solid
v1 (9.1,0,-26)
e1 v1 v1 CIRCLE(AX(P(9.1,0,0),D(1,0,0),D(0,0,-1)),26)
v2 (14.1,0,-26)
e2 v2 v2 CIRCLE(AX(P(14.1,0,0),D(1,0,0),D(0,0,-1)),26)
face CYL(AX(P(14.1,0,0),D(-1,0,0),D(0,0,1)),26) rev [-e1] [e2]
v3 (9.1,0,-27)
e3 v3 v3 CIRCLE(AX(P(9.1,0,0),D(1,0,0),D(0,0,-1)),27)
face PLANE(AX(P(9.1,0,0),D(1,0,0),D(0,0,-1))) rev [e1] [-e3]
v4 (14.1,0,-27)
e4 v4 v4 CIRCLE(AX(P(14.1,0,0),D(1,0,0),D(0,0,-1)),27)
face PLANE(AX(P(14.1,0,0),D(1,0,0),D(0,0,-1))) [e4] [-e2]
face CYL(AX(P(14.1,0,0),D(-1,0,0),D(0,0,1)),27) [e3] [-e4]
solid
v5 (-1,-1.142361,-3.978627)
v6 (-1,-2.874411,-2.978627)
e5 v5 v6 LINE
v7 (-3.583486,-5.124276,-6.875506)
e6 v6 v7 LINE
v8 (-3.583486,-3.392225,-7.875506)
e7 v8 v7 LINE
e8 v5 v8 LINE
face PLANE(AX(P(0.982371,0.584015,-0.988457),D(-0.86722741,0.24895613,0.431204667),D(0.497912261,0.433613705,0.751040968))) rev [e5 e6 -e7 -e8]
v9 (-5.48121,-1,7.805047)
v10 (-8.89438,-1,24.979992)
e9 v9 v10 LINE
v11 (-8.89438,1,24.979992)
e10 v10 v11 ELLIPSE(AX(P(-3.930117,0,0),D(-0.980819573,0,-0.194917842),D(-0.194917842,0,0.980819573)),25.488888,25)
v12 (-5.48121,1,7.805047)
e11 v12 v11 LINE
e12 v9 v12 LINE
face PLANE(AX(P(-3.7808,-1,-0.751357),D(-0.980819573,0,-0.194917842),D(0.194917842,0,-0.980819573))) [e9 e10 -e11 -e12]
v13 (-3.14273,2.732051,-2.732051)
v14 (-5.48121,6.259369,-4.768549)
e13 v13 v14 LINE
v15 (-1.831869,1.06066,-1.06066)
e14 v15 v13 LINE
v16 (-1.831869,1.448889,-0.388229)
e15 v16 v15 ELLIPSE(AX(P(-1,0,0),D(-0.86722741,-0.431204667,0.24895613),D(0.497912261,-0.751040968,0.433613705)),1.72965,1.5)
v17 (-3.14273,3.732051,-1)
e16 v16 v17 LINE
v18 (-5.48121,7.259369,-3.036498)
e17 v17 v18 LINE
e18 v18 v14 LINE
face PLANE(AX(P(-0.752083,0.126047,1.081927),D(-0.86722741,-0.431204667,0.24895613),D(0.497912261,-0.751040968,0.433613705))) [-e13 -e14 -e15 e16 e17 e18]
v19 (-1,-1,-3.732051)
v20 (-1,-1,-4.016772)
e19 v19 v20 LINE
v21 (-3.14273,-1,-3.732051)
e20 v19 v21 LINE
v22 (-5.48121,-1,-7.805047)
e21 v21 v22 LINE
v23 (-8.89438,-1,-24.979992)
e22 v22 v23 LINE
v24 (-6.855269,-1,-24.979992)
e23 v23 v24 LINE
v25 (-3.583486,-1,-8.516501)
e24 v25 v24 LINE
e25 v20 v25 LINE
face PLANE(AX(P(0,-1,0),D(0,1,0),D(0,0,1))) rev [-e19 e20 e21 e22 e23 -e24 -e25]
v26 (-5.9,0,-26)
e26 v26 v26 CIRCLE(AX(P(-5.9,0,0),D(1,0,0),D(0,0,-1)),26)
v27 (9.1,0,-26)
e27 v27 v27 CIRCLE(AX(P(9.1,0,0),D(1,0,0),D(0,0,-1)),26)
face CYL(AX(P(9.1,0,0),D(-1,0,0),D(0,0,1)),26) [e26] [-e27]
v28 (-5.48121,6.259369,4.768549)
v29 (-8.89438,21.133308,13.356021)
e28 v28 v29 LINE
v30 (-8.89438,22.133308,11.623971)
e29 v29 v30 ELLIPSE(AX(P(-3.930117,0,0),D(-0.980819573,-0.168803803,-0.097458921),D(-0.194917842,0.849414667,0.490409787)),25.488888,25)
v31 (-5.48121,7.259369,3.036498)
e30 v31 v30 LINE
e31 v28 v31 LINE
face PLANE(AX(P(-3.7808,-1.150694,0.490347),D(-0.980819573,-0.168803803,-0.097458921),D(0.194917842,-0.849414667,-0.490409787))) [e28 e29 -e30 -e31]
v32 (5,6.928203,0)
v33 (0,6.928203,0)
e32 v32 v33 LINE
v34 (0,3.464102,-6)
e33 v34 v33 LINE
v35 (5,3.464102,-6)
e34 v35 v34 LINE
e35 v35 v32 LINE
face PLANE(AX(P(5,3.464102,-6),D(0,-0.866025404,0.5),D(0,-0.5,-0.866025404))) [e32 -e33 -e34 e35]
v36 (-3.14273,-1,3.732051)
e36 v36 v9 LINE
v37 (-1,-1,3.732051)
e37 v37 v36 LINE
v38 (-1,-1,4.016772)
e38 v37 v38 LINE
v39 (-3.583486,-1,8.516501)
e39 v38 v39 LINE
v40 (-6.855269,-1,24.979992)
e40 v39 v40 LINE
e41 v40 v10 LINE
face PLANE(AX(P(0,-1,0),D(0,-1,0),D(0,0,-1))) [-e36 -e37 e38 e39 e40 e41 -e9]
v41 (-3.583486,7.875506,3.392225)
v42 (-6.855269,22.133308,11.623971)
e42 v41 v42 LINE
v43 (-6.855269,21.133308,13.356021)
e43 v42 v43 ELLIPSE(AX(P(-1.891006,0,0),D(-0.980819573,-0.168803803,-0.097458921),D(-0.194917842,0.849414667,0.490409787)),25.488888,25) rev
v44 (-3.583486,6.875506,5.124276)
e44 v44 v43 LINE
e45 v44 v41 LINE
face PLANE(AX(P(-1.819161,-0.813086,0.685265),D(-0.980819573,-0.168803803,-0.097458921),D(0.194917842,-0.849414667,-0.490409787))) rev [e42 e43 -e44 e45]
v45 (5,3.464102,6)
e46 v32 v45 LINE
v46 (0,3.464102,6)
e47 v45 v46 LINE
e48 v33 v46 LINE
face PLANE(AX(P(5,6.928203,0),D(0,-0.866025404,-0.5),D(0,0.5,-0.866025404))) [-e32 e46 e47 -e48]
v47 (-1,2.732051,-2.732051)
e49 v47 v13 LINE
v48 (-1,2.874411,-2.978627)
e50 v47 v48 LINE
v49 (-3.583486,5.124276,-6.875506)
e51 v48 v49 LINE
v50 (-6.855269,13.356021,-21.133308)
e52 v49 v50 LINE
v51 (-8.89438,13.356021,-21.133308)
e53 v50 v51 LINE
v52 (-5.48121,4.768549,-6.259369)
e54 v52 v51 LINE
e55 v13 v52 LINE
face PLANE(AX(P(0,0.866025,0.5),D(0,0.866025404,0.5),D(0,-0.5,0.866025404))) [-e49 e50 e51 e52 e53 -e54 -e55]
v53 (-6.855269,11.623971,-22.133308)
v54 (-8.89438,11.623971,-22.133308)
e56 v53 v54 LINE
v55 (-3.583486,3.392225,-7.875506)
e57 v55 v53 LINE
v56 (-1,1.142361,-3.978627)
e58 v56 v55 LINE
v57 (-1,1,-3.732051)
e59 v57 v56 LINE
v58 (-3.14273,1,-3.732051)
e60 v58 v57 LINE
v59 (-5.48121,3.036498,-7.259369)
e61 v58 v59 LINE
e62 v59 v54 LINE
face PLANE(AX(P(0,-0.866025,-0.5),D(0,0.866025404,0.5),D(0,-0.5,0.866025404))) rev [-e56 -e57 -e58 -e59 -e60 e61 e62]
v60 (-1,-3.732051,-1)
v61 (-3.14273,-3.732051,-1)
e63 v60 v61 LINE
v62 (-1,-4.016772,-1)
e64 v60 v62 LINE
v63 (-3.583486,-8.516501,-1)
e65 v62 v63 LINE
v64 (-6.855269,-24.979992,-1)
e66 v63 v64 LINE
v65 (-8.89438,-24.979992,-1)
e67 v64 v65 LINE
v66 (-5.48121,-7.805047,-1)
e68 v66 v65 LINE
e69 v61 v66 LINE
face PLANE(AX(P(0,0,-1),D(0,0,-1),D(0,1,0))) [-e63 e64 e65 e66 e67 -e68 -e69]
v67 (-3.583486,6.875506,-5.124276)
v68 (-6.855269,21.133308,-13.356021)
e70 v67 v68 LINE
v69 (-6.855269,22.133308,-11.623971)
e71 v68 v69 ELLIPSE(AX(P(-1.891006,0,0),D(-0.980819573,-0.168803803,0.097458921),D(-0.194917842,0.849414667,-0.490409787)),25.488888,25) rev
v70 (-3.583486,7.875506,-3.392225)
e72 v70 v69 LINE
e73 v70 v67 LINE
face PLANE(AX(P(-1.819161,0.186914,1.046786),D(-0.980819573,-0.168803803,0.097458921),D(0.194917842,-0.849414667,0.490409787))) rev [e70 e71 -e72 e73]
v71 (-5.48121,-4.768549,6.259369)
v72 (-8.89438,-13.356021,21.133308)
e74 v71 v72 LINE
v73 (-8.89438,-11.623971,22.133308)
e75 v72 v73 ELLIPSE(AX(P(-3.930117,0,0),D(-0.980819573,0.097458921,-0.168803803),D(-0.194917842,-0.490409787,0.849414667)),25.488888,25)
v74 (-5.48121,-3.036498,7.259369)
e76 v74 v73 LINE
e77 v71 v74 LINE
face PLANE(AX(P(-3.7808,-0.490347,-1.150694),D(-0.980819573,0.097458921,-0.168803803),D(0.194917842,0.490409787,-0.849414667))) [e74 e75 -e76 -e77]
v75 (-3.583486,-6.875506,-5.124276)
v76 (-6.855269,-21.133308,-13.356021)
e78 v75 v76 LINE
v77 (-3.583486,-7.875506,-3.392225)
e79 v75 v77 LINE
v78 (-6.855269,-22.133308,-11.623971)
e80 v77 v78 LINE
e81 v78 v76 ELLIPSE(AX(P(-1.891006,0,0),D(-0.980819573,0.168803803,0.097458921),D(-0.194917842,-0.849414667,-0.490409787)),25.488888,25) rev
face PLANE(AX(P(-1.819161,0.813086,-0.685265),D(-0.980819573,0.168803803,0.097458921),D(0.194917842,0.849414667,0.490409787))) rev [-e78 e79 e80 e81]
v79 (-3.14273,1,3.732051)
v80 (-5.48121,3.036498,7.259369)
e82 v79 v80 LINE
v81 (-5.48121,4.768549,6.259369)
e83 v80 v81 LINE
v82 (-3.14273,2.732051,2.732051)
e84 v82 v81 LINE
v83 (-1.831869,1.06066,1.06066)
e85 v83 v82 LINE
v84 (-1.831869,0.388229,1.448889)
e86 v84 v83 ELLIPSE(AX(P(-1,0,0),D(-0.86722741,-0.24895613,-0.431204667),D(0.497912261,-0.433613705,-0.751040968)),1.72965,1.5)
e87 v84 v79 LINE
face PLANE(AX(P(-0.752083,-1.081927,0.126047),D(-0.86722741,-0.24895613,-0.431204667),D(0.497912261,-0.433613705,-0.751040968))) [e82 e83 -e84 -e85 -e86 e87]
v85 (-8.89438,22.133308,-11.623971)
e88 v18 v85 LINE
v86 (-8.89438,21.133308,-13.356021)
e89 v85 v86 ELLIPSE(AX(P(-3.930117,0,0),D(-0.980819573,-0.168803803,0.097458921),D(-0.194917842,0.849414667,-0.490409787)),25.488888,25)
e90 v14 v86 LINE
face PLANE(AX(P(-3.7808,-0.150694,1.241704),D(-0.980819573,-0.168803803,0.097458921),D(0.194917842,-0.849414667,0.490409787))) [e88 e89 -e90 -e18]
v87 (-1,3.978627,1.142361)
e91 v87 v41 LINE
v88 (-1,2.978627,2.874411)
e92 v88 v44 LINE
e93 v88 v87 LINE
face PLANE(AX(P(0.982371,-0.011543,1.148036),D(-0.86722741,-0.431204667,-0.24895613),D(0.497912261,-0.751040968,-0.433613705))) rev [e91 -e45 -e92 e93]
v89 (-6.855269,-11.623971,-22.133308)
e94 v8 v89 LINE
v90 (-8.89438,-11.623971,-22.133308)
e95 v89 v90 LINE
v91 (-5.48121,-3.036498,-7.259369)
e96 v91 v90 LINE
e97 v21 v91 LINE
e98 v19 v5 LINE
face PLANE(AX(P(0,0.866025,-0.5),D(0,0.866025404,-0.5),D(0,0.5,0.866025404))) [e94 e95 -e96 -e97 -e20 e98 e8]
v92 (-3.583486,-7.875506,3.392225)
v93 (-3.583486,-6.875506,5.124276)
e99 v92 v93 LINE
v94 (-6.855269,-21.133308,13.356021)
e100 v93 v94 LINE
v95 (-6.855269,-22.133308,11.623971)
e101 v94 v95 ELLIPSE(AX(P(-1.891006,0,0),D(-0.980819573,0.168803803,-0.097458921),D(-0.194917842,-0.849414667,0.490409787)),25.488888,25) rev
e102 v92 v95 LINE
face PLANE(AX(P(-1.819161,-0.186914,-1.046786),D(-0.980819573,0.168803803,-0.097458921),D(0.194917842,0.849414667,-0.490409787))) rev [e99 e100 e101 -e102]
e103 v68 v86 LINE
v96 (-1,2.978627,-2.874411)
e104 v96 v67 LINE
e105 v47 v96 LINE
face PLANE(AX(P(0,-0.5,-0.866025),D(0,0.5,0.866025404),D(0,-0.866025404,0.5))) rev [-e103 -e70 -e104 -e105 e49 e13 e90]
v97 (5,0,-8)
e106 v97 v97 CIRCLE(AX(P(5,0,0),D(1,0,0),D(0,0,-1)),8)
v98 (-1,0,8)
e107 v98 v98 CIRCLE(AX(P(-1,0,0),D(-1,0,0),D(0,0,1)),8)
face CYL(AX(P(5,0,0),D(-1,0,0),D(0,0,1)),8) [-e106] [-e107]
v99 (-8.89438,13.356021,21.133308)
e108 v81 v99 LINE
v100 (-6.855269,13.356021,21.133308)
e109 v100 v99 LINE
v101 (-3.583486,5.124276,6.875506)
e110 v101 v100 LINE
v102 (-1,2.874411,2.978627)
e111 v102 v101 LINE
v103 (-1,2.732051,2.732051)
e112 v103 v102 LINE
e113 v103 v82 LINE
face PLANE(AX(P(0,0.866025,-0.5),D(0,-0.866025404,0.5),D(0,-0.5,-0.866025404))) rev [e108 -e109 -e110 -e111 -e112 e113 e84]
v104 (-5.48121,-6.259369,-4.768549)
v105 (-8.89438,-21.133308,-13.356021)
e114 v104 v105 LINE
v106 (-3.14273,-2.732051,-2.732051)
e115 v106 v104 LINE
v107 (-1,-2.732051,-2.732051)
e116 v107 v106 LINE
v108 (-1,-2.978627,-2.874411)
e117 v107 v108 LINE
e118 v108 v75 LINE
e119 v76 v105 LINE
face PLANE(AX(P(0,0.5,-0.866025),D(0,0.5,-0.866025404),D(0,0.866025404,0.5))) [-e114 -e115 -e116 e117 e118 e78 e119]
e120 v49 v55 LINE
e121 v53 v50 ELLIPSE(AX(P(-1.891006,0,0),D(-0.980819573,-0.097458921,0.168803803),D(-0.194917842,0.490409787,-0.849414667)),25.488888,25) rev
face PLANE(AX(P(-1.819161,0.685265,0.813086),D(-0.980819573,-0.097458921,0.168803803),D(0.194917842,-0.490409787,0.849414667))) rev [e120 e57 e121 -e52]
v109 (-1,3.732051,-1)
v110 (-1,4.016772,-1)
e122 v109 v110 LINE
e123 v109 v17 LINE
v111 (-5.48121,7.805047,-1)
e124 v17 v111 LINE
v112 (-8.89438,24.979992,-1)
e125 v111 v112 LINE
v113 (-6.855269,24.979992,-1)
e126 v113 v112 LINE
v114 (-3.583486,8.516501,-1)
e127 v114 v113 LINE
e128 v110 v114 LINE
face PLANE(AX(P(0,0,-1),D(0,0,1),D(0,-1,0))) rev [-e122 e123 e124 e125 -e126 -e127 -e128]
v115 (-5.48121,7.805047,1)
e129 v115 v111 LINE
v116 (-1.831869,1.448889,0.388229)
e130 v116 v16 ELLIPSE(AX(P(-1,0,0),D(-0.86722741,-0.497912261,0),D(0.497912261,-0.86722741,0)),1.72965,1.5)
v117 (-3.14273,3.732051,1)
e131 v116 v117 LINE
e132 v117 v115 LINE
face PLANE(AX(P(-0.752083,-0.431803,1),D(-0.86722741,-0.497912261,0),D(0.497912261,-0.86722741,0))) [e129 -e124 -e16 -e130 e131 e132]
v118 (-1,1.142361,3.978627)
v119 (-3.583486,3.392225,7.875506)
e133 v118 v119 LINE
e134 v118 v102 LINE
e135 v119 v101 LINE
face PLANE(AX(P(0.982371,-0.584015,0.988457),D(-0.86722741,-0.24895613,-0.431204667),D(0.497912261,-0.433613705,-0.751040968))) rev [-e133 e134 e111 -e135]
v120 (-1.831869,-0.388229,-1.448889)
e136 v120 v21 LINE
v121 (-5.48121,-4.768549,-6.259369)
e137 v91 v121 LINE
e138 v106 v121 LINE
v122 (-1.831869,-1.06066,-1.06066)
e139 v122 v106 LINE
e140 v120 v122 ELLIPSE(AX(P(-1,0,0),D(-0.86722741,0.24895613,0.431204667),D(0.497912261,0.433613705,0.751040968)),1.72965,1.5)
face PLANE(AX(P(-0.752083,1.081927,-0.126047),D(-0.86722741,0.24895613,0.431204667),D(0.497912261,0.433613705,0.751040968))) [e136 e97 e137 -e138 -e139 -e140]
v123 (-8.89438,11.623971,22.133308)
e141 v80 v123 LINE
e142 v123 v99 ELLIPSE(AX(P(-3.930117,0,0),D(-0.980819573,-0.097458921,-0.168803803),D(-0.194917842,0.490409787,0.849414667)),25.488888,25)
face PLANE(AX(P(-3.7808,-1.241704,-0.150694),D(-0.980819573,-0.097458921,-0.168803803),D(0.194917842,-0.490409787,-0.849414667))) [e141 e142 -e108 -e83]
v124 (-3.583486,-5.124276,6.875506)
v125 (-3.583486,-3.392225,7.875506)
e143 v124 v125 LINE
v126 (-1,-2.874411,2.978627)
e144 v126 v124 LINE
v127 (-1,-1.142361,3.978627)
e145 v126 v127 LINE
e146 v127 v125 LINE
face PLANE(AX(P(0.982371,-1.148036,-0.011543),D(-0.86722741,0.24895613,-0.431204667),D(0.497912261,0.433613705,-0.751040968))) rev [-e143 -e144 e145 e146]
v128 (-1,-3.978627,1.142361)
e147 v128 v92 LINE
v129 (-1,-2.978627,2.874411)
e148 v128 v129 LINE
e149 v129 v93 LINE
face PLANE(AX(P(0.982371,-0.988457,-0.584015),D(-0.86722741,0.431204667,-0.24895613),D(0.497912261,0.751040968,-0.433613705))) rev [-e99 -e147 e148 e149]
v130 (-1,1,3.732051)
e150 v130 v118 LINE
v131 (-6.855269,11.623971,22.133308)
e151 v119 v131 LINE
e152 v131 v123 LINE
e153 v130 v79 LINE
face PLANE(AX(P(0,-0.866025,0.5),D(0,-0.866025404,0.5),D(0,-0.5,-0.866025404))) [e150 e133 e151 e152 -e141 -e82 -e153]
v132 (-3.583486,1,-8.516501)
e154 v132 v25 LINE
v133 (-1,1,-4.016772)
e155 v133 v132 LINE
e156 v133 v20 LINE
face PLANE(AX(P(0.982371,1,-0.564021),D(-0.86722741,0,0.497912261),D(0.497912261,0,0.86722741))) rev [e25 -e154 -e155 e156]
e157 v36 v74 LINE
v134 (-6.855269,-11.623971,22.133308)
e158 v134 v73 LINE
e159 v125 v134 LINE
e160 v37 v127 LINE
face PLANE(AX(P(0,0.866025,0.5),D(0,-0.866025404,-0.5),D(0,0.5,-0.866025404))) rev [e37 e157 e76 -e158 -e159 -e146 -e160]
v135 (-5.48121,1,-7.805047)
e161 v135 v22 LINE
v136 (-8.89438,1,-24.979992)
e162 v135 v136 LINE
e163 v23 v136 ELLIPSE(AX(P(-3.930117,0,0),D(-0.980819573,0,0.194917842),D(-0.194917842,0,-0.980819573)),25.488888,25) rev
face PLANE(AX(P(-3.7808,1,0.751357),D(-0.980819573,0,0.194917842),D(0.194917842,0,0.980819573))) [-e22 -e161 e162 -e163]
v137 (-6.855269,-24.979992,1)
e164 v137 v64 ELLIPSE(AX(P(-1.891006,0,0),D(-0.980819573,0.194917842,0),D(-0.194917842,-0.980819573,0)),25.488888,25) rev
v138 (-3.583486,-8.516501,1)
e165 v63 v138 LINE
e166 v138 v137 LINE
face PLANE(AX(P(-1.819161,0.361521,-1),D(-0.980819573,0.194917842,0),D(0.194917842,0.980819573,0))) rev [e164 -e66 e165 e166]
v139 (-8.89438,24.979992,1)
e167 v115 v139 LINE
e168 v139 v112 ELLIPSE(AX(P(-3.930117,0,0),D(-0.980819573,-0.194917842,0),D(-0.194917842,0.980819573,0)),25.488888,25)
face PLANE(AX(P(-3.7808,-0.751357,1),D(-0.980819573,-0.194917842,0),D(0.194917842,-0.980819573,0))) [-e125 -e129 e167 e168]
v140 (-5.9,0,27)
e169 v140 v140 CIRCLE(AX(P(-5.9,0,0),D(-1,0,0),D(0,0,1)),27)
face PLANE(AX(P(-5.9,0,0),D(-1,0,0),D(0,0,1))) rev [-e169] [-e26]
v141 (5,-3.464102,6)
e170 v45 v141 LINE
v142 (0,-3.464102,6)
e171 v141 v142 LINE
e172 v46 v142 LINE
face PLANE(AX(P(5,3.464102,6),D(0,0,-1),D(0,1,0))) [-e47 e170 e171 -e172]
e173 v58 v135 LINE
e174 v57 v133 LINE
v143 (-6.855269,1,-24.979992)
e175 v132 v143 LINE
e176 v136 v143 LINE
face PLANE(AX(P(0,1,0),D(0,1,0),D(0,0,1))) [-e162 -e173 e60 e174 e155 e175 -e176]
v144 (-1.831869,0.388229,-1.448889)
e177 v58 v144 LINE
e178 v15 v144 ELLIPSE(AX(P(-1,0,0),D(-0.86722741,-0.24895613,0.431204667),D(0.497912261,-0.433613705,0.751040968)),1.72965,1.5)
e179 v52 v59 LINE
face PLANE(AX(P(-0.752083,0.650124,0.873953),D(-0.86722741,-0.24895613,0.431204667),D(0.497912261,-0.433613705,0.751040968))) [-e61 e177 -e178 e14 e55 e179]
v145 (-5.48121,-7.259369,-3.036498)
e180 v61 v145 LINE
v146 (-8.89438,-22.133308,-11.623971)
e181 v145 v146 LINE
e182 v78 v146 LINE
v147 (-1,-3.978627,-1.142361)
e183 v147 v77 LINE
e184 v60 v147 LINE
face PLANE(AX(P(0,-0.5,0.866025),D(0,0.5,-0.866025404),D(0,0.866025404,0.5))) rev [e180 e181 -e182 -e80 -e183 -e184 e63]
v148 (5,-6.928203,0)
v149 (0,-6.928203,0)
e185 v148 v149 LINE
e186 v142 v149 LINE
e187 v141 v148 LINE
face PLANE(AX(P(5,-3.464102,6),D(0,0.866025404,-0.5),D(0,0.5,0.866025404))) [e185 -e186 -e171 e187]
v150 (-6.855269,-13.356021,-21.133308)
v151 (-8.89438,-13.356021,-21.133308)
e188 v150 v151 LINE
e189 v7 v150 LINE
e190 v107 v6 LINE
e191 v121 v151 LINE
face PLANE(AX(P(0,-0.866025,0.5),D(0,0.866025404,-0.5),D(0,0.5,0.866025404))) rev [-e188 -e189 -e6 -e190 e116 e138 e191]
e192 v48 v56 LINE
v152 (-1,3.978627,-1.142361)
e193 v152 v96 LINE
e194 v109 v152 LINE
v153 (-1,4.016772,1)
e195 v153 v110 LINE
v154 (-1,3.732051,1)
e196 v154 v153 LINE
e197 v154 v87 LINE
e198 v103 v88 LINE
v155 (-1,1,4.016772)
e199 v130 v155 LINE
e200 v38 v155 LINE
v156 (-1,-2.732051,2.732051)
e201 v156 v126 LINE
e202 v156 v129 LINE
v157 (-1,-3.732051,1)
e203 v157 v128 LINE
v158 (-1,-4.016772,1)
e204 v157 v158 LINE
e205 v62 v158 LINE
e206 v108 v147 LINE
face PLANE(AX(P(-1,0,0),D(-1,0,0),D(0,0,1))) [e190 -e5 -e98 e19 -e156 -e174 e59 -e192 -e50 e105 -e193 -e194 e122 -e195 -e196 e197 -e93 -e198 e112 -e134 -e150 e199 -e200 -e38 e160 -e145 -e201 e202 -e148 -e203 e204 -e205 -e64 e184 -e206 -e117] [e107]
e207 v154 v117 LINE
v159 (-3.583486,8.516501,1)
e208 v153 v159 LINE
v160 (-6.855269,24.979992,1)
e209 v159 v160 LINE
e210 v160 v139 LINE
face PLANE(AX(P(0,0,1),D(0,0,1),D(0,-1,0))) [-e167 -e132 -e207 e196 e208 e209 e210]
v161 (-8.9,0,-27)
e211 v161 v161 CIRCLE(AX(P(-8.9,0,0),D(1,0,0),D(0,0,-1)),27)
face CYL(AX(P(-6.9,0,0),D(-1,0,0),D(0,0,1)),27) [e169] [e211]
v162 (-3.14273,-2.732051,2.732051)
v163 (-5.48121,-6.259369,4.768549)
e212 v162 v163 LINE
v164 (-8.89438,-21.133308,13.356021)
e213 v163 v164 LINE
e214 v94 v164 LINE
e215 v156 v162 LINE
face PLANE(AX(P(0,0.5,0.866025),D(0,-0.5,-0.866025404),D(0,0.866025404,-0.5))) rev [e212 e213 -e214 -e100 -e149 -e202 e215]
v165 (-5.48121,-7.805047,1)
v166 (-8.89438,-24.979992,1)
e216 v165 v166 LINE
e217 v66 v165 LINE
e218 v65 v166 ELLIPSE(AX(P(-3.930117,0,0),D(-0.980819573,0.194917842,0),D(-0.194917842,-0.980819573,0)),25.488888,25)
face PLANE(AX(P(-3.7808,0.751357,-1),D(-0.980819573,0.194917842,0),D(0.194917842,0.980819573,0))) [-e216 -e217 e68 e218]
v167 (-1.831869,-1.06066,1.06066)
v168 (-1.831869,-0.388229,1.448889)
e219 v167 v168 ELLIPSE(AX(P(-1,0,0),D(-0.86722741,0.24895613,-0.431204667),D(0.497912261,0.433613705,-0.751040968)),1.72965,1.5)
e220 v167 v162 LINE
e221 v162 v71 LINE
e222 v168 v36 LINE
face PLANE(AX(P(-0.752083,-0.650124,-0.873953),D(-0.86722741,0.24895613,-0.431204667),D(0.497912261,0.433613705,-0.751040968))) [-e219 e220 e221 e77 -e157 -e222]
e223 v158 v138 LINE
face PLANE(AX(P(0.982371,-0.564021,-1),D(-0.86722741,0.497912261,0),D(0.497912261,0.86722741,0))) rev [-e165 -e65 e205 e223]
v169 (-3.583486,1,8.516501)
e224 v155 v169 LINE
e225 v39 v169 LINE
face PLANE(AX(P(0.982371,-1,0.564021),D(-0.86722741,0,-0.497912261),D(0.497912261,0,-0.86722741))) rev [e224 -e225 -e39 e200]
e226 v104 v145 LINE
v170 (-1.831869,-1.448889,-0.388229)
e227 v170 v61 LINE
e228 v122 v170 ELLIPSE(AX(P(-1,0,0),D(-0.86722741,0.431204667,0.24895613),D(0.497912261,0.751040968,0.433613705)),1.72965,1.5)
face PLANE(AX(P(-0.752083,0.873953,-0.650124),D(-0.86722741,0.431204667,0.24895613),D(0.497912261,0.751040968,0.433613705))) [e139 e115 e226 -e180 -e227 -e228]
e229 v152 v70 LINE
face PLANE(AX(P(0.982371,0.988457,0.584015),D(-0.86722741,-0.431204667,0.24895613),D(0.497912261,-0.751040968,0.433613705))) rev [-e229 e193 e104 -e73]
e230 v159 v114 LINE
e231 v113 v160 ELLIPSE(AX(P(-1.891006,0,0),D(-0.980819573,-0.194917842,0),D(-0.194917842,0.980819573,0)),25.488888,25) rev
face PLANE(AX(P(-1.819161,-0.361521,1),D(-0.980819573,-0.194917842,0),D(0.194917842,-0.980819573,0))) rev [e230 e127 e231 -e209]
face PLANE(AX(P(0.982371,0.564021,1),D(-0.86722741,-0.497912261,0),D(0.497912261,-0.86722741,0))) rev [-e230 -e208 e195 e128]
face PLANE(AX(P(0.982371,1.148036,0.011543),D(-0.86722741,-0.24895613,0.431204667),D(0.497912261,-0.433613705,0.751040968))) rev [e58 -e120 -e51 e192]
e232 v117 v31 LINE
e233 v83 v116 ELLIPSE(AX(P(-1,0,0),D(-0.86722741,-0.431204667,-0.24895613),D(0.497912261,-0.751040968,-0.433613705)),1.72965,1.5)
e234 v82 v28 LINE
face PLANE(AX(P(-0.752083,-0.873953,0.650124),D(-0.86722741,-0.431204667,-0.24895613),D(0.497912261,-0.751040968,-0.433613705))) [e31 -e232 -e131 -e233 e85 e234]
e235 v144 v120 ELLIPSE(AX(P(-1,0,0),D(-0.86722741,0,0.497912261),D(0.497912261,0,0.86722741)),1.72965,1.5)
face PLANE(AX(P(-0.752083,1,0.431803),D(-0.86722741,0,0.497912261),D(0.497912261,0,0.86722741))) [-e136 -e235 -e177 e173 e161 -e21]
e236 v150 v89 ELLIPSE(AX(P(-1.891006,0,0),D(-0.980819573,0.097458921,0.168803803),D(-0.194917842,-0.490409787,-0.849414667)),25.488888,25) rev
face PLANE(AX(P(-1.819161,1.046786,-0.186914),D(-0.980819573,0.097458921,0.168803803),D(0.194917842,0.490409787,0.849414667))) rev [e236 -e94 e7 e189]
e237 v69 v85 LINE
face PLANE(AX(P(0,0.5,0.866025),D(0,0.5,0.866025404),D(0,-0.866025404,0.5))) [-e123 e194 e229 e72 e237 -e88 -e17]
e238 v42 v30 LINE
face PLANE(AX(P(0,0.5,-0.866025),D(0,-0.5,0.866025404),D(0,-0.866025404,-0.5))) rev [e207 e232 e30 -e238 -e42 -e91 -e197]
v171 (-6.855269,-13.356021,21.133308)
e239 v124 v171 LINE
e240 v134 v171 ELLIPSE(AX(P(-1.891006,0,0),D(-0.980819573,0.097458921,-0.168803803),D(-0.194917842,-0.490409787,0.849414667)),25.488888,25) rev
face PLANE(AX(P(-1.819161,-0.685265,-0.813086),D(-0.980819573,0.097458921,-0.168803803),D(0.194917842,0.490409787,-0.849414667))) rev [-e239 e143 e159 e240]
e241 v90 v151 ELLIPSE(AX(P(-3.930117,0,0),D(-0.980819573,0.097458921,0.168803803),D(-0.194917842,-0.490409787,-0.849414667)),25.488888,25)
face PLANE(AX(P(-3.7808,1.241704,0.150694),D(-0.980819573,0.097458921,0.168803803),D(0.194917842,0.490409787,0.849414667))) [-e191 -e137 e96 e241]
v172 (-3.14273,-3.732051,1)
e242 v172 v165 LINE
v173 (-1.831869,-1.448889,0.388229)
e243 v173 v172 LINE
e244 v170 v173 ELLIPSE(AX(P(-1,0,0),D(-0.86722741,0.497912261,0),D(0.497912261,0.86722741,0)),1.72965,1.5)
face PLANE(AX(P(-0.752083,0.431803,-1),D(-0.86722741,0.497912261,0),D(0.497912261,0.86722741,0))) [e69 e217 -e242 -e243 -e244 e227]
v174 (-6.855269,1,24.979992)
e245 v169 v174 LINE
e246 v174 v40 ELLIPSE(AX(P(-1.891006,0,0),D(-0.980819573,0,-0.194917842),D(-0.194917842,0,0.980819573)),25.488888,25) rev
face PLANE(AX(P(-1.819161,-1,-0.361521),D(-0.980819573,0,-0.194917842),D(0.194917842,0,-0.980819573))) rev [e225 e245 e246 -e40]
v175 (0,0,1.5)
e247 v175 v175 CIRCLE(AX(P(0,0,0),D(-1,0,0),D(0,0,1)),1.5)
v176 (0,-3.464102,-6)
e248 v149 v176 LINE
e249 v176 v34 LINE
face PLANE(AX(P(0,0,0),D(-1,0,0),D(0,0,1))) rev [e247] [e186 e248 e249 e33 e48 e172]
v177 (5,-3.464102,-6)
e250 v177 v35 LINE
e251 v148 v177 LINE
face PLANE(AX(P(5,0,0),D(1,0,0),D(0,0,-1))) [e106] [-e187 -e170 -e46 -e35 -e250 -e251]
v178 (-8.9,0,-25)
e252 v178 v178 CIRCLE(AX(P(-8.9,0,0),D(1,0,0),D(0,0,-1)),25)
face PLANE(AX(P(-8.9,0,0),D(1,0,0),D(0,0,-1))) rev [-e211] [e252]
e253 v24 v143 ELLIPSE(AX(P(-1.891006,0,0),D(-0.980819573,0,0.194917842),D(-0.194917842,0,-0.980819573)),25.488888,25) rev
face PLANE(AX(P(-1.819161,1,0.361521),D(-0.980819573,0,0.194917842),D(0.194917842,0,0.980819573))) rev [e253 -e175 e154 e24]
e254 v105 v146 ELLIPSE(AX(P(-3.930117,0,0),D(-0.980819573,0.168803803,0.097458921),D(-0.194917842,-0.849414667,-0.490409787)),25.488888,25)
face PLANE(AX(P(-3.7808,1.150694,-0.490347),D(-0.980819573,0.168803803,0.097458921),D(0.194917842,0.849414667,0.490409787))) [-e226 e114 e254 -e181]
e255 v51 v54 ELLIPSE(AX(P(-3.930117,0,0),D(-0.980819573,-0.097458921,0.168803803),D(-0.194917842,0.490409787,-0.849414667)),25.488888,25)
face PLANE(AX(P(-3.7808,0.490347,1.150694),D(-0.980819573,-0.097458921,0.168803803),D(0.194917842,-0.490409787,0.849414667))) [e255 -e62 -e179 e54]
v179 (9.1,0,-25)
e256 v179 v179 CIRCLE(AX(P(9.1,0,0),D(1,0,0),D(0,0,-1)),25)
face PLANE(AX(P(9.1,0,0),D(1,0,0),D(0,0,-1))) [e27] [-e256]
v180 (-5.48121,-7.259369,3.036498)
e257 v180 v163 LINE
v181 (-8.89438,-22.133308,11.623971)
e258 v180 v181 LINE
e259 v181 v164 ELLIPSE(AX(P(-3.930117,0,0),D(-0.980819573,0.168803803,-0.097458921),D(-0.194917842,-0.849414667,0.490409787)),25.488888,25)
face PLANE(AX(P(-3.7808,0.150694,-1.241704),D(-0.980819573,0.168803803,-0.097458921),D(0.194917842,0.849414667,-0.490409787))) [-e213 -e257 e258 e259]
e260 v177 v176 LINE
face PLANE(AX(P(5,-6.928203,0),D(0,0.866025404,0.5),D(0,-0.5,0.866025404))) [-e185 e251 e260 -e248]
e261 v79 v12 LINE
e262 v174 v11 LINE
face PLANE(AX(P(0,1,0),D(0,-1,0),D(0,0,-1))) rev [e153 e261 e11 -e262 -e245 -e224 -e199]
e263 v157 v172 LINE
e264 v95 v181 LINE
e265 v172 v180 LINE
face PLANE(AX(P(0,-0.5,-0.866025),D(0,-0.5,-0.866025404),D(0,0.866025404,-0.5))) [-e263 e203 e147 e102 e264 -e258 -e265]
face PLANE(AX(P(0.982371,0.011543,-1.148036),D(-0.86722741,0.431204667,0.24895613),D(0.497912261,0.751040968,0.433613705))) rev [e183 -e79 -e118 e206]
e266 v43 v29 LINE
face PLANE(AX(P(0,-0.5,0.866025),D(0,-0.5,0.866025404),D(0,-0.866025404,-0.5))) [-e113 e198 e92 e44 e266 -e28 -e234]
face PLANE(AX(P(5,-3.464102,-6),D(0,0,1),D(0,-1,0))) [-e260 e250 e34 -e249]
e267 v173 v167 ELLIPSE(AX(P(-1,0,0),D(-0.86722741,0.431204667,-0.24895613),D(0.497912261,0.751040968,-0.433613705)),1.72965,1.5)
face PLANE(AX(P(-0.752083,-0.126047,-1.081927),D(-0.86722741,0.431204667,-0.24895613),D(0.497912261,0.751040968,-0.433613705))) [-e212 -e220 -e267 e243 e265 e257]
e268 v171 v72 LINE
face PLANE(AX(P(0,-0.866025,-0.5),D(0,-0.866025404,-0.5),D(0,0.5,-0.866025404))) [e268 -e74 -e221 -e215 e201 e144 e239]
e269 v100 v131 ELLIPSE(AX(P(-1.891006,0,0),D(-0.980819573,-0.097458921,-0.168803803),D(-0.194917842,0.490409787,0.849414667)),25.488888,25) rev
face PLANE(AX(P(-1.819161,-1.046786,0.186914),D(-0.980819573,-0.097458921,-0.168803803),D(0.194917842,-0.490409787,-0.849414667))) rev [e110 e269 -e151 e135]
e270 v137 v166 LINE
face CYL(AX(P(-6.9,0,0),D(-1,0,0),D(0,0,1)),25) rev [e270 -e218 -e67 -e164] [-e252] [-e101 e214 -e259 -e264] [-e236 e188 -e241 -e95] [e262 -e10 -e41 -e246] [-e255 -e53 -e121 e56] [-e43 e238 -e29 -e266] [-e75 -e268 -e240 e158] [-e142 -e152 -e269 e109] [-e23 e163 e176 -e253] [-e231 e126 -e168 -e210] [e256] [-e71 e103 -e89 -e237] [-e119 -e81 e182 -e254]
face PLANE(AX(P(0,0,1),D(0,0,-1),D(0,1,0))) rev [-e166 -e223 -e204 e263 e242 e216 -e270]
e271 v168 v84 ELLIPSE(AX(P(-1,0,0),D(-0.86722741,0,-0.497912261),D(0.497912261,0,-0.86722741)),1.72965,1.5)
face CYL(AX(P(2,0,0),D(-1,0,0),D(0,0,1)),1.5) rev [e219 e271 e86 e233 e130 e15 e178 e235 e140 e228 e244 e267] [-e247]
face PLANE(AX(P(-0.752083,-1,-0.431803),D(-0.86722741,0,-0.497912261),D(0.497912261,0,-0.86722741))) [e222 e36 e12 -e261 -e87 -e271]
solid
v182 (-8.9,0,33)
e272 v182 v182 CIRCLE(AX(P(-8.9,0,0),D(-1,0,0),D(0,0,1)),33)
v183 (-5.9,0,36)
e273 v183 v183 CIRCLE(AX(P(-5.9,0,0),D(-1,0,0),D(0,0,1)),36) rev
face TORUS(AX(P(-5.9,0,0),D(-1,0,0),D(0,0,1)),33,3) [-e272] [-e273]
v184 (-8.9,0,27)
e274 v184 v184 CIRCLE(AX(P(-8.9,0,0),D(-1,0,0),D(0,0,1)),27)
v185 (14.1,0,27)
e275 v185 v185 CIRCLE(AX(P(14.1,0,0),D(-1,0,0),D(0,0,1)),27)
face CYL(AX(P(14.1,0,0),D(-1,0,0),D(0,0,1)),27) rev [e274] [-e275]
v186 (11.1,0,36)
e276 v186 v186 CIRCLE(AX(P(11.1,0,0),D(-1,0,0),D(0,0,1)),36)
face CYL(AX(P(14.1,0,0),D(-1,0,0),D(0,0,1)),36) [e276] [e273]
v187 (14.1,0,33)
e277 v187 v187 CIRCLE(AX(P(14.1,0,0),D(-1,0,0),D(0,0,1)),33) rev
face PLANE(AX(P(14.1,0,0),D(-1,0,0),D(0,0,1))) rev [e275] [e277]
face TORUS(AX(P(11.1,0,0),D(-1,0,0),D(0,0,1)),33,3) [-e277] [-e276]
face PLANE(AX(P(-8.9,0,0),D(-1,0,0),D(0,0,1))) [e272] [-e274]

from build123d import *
from build123d.topology import SkipClean

# Parameters (mm, degrees)
SKETCH1_R            = 8
BOSS_EXTRUDE1_DEPTH  = 5
SKETCH2_R            = 8
BOSS_EXTRUDE2_DEPTH  = 1
SKETCH3_R            = 1.5
CUT_EXTRUDE1_DEPTH   = 3
BOSS_EXTRUDE3_DEPTH  = 1
SKETCH5_R            = 1.5
CUT_EXTRUDE2_DEPTH   = 50
CIRPATTERN3_COUNT    = 12
SKETCH12_R           = 27
SKETCH12_R_2         = 25
BOSS_EXTRUDE5_DEPTH  = 2
SKETCH14_R           = 27
SKETCH14_R_2         = 25
BOSS_EXTRUDE7_DEPTH  = 3
SKETCH15_R           = 26
SKETCH15_R_2         = 25
BOSS_EXTRUDE8_DEPTH  = 15
SKETCH16_R           = 27
SKETCH16_R_2         = 26
BOSS_EXTRUDE9_DEPTH  = 5
SKETCH17_R           = 36
SKETCH17_R_2         = 27
BOSS_EXTRUDE10_DEPTH = 23
FILLET3_R            = 3


with BuildPart() as part:
    # Sketch1 → Boss-Extrude1 (new body)
    with BuildSketch(Plane(origin=(0, 0, 0), x_dir=(0, 0, -1), z_dir=(1, 0, 0))):
        Circle(SKETCH1_R)
        Polygon((0, 6.92820323), (-6, 3.464101615), (-6, -3.464101615), (0, -6.92820323), (6, -3.464101615), (6, 3.464101615), align=None, mode=Mode.SUBTRACT)
    extrude(amount=BOSS_EXTRUDE1_DEPTH)



with BuildPart() as body_2:
    # Sketch2 → Boss-Extrude2 (new body)
    with BuildSketch(Plane.ZY):
        Circle(SKETCH2_R)
    extrude(amount=BOSS_EXTRUDE2_DEPTH)

    # Sketch3 → Cut-Extrude1 (cut)
    with BuildSketch(Plane.ZY.offset(1)):
        Circle(SKETCH3_R)
    extrude(amount=-CUT_EXTRUDE1_DEPTH, mode=Mode.SUBTRACT)


with BuildPart() as body_3:
    # Sketch4 → Boss-Extrude3 (new, symmetric)
    with BuildSketch(Plane(origin=(0, 0, 0), x_dir=(1, 0, 0), z_dir=(0, 1, 0))):
        Polygon((-5.481210349, 7.805046689), (-1, 0), (-1, 4.016771943), (-3.583486264, 8.516500664), (-6.859244832, 25), (-8.898355852, 25), align=None)
    extrude(amount=BOSS_EXTRUDE3_DEPTH, both=True)

    # Sketch5 → Cut-Extrude2 (cut)
    with BuildSketch(Plane(origin=(0, 0, 0), x_dir=(0, 0, -1), z_dir=(1, 0, 0))):
        Circle(SKETCH5_R)
    extrude(amount=-CUT_EXTRUDE2_DEPTH, mode=Mode.SUBTRACT)


with BuildPart() as cirpattern3_1:
    # CirPattern3: pattern copy
    add(body_3.part.rotate(Axis((-1, 0, 0), (-1, 0, 0)), 1 * 360 / CIRPATTERN3_COUNT))


with BuildPart() as cirpattern3_2:
    # CirPattern3: pattern copy
    add(body_3.part.rotate(Axis((-1, 0, 0), (-1, 0, 0)), 2 * 360 / CIRPATTERN3_COUNT))


with BuildPart() as cirpattern3_3:
    # CirPattern3: pattern copy
    add(body_3.part.rotate(Axis((-1, 0, 0), (-1, 0, 0)), 3 * 360 / CIRPATTERN3_COUNT))


with BuildPart() as cirpattern3_4:
    # CirPattern3: pattern copy
    add(body_3.part.rotate(Axis((-1, 0, 0), (-1, 0, 0)), 4 * 360 / CIRPATTERN3_COUNT))


with BuildPart() as cirpattern3_5:
    # CirPattern3: pattern copy
    add(body_3.part.rotate(Axis((-1, 0, 0), (-1, 0, 0)), 5 * 360 / CIRPATTERN3_COUNT))


with BuildPart() as cirpattern3_6:
    # CirPattern3: pattern copy
    add(body_3.part.rotate(Axis((-1, 0, 0), (-1, 0, 0)), 6 * 360 / CIRPATTERN3_COUNT))


with BuildPart() as cirpattern3_7:
    # CirPattern3: pattern copy
    add(body_3.part.rotate(Axis((-1, 0, 0), (-1, 0, 0)), 7 * 360 / CIRPATTERN3_COUNT))


with BuildPart() as cirpattern3_8:
    # CirPattern3: pattern copy
    add(body_3.part.rotate(Axis((-1, 0, 0), (-1, 0, 0)), 8 * 360 / CIRPATTERN3_COUNT))


with BuildPart() as cirpattern3_9:
    # CirPattern3: pattern copy
    add(body_3.part.rotate(Axis((-1, 0, 0), (-1, 0, 0)), 9 * 360 / CIRPATTERN3_COUNT))


with BuildPart() as cirpattern3_10:
    # CirPattern3: pattern copy
    add(body_3.part.rotate(Axis((-1, 0, 0), (-1, 0, 0)), 10 * 360 / CIRPATTERN3_COUNT))


with BuildPart() as cirpattern3_11:
    # CirPattern3: pattern copy
    add(body_3.part.rotate(Axis((-1, 0, 0), (-1, 0, 0)), 11 * 360 / CIRPATTERN3_COUNT))


with BuildPart() as body_3_1:
    add(body_3.part)

    add(cirpattern3_1.part)  # Boss-Extrude5 merges CirPattern3_1

    add(cirpattern3_2.part)  # Boss-Extrude5 merges CirPattern3_2

    add(cirpattern3_3.part)  # Boss-Extrude5 merges CirPattern3_3

    add(cirpattern3_4.part)  # Boss-Extrude5 merges CirPattern3_4

    add(cirpattern3_5.part)  # Boss-Extrude5 merges CirPattern3_5

    add(cirpattern3_6.part)  # Boss-Extrude5 merges CirPattern3_6

    add(cirpattern3_7.part)  # Boss-Extrude5 merges CirPattern3_7

    add(cirpattern3_8.part)  # Boss-Extrude5 merges CirPattern3_8

    add(cirpattern3_9.part)  # Boss-Extrude5 merges CirPattern3_9

    add(cirpattern3_10.part)  # Boss-Extrude5 merges CirPattern3_10

    add(cirpattern3_11.part)  # Boss-Extrude5 merges CirPattern3_11
    # Sketch12 → Boss-Extrude5 (add)
    with BuildSketch(Plane(origin=(-8.9, 0, 0), x_dir=(0, 0, -1), z_dir=(1, 0, 0))):
        Circle(SKETCH12_R)
        Circle(SKETCH12_R_2, mode=Mode.SUBTRACT)
    extrude(amount=BOSS_EXTRUDE5_DEPTH)

    # Sketch14 → Boss-Extrude7 (add)
    with SkipClean():  # the faces are left unmerged after this step: merging them gives an invalid solid
        with BuildSketch(Plane.ZY.offset(8.9)):
            Circle(SKETCH14_R)
            Circle(SKETCH14_R_2, mode=Mode.SUBTRACT)
        extrude(amount=-BOSS_EXTRUDE7_DEPTH)


with BuildPart() as part_1:
    with SkipClean():  # the faces are left unmerged after this step: merging them gives an invalid solid
        add(part.part)

        add(body_2.part)  # Boss-Extrude8 merges body 2

        add(body_3_1.part)  # Boss-Extrude8 merges body 3
        # Sketch15 → Boss-Extrude8 (add)
        with BuildSketch(Plane(origin=(-5.9, 0, 0), x_dir=(0, 0, -1), z_dir=(1, 0, 0))):
            Circle(SKETCH15_R)
            Circle(SKETCH15_R_2, mode=Mode.SUBTRACT)
        extrude(amount=BOSS_EXTRUDE8_DEPTH)


with BuildPart() as body_2_2:
    # Sketch16 → Boss-Extrude9 (new body)
    with BuildSketch(Plane(origin=(9.1, 0, 0), x_dir=(0, 0, -1), z_dir=(1, 0, 0))):
        Circle(SKETCH16_R)
        Circle(SKETCH16_R_2, mode=Mode.SUBTRACT)
    extrude(amount=BOSS_EXTRUDE9_DEPTH)


with BuildPart() as body_3_2:
    # Sketch17 → Boss-Extrude10 (new body)
    with BuildSketch(Plane.ZY.offset(8.9)):
        Circle(SKETCH17_R)
        Circle(SKETCH17_R_2, mode=Mode.SUBTRACT)
    extrude(amount=-BOSS_EXTRUDE10_DEPTH)

    # Fillet3
    fillet3_edges = [body_3_2.edges().sort_by_distance(p)[0] for p in [
        (14.1, 0, -36),
        (-8.9, 0, -36),
    ]]
    fillet(fillet3_edges, radius=FILLET3_R)


solid = Compound([part_1.part, body_2_2.part, body_3_2.part])
